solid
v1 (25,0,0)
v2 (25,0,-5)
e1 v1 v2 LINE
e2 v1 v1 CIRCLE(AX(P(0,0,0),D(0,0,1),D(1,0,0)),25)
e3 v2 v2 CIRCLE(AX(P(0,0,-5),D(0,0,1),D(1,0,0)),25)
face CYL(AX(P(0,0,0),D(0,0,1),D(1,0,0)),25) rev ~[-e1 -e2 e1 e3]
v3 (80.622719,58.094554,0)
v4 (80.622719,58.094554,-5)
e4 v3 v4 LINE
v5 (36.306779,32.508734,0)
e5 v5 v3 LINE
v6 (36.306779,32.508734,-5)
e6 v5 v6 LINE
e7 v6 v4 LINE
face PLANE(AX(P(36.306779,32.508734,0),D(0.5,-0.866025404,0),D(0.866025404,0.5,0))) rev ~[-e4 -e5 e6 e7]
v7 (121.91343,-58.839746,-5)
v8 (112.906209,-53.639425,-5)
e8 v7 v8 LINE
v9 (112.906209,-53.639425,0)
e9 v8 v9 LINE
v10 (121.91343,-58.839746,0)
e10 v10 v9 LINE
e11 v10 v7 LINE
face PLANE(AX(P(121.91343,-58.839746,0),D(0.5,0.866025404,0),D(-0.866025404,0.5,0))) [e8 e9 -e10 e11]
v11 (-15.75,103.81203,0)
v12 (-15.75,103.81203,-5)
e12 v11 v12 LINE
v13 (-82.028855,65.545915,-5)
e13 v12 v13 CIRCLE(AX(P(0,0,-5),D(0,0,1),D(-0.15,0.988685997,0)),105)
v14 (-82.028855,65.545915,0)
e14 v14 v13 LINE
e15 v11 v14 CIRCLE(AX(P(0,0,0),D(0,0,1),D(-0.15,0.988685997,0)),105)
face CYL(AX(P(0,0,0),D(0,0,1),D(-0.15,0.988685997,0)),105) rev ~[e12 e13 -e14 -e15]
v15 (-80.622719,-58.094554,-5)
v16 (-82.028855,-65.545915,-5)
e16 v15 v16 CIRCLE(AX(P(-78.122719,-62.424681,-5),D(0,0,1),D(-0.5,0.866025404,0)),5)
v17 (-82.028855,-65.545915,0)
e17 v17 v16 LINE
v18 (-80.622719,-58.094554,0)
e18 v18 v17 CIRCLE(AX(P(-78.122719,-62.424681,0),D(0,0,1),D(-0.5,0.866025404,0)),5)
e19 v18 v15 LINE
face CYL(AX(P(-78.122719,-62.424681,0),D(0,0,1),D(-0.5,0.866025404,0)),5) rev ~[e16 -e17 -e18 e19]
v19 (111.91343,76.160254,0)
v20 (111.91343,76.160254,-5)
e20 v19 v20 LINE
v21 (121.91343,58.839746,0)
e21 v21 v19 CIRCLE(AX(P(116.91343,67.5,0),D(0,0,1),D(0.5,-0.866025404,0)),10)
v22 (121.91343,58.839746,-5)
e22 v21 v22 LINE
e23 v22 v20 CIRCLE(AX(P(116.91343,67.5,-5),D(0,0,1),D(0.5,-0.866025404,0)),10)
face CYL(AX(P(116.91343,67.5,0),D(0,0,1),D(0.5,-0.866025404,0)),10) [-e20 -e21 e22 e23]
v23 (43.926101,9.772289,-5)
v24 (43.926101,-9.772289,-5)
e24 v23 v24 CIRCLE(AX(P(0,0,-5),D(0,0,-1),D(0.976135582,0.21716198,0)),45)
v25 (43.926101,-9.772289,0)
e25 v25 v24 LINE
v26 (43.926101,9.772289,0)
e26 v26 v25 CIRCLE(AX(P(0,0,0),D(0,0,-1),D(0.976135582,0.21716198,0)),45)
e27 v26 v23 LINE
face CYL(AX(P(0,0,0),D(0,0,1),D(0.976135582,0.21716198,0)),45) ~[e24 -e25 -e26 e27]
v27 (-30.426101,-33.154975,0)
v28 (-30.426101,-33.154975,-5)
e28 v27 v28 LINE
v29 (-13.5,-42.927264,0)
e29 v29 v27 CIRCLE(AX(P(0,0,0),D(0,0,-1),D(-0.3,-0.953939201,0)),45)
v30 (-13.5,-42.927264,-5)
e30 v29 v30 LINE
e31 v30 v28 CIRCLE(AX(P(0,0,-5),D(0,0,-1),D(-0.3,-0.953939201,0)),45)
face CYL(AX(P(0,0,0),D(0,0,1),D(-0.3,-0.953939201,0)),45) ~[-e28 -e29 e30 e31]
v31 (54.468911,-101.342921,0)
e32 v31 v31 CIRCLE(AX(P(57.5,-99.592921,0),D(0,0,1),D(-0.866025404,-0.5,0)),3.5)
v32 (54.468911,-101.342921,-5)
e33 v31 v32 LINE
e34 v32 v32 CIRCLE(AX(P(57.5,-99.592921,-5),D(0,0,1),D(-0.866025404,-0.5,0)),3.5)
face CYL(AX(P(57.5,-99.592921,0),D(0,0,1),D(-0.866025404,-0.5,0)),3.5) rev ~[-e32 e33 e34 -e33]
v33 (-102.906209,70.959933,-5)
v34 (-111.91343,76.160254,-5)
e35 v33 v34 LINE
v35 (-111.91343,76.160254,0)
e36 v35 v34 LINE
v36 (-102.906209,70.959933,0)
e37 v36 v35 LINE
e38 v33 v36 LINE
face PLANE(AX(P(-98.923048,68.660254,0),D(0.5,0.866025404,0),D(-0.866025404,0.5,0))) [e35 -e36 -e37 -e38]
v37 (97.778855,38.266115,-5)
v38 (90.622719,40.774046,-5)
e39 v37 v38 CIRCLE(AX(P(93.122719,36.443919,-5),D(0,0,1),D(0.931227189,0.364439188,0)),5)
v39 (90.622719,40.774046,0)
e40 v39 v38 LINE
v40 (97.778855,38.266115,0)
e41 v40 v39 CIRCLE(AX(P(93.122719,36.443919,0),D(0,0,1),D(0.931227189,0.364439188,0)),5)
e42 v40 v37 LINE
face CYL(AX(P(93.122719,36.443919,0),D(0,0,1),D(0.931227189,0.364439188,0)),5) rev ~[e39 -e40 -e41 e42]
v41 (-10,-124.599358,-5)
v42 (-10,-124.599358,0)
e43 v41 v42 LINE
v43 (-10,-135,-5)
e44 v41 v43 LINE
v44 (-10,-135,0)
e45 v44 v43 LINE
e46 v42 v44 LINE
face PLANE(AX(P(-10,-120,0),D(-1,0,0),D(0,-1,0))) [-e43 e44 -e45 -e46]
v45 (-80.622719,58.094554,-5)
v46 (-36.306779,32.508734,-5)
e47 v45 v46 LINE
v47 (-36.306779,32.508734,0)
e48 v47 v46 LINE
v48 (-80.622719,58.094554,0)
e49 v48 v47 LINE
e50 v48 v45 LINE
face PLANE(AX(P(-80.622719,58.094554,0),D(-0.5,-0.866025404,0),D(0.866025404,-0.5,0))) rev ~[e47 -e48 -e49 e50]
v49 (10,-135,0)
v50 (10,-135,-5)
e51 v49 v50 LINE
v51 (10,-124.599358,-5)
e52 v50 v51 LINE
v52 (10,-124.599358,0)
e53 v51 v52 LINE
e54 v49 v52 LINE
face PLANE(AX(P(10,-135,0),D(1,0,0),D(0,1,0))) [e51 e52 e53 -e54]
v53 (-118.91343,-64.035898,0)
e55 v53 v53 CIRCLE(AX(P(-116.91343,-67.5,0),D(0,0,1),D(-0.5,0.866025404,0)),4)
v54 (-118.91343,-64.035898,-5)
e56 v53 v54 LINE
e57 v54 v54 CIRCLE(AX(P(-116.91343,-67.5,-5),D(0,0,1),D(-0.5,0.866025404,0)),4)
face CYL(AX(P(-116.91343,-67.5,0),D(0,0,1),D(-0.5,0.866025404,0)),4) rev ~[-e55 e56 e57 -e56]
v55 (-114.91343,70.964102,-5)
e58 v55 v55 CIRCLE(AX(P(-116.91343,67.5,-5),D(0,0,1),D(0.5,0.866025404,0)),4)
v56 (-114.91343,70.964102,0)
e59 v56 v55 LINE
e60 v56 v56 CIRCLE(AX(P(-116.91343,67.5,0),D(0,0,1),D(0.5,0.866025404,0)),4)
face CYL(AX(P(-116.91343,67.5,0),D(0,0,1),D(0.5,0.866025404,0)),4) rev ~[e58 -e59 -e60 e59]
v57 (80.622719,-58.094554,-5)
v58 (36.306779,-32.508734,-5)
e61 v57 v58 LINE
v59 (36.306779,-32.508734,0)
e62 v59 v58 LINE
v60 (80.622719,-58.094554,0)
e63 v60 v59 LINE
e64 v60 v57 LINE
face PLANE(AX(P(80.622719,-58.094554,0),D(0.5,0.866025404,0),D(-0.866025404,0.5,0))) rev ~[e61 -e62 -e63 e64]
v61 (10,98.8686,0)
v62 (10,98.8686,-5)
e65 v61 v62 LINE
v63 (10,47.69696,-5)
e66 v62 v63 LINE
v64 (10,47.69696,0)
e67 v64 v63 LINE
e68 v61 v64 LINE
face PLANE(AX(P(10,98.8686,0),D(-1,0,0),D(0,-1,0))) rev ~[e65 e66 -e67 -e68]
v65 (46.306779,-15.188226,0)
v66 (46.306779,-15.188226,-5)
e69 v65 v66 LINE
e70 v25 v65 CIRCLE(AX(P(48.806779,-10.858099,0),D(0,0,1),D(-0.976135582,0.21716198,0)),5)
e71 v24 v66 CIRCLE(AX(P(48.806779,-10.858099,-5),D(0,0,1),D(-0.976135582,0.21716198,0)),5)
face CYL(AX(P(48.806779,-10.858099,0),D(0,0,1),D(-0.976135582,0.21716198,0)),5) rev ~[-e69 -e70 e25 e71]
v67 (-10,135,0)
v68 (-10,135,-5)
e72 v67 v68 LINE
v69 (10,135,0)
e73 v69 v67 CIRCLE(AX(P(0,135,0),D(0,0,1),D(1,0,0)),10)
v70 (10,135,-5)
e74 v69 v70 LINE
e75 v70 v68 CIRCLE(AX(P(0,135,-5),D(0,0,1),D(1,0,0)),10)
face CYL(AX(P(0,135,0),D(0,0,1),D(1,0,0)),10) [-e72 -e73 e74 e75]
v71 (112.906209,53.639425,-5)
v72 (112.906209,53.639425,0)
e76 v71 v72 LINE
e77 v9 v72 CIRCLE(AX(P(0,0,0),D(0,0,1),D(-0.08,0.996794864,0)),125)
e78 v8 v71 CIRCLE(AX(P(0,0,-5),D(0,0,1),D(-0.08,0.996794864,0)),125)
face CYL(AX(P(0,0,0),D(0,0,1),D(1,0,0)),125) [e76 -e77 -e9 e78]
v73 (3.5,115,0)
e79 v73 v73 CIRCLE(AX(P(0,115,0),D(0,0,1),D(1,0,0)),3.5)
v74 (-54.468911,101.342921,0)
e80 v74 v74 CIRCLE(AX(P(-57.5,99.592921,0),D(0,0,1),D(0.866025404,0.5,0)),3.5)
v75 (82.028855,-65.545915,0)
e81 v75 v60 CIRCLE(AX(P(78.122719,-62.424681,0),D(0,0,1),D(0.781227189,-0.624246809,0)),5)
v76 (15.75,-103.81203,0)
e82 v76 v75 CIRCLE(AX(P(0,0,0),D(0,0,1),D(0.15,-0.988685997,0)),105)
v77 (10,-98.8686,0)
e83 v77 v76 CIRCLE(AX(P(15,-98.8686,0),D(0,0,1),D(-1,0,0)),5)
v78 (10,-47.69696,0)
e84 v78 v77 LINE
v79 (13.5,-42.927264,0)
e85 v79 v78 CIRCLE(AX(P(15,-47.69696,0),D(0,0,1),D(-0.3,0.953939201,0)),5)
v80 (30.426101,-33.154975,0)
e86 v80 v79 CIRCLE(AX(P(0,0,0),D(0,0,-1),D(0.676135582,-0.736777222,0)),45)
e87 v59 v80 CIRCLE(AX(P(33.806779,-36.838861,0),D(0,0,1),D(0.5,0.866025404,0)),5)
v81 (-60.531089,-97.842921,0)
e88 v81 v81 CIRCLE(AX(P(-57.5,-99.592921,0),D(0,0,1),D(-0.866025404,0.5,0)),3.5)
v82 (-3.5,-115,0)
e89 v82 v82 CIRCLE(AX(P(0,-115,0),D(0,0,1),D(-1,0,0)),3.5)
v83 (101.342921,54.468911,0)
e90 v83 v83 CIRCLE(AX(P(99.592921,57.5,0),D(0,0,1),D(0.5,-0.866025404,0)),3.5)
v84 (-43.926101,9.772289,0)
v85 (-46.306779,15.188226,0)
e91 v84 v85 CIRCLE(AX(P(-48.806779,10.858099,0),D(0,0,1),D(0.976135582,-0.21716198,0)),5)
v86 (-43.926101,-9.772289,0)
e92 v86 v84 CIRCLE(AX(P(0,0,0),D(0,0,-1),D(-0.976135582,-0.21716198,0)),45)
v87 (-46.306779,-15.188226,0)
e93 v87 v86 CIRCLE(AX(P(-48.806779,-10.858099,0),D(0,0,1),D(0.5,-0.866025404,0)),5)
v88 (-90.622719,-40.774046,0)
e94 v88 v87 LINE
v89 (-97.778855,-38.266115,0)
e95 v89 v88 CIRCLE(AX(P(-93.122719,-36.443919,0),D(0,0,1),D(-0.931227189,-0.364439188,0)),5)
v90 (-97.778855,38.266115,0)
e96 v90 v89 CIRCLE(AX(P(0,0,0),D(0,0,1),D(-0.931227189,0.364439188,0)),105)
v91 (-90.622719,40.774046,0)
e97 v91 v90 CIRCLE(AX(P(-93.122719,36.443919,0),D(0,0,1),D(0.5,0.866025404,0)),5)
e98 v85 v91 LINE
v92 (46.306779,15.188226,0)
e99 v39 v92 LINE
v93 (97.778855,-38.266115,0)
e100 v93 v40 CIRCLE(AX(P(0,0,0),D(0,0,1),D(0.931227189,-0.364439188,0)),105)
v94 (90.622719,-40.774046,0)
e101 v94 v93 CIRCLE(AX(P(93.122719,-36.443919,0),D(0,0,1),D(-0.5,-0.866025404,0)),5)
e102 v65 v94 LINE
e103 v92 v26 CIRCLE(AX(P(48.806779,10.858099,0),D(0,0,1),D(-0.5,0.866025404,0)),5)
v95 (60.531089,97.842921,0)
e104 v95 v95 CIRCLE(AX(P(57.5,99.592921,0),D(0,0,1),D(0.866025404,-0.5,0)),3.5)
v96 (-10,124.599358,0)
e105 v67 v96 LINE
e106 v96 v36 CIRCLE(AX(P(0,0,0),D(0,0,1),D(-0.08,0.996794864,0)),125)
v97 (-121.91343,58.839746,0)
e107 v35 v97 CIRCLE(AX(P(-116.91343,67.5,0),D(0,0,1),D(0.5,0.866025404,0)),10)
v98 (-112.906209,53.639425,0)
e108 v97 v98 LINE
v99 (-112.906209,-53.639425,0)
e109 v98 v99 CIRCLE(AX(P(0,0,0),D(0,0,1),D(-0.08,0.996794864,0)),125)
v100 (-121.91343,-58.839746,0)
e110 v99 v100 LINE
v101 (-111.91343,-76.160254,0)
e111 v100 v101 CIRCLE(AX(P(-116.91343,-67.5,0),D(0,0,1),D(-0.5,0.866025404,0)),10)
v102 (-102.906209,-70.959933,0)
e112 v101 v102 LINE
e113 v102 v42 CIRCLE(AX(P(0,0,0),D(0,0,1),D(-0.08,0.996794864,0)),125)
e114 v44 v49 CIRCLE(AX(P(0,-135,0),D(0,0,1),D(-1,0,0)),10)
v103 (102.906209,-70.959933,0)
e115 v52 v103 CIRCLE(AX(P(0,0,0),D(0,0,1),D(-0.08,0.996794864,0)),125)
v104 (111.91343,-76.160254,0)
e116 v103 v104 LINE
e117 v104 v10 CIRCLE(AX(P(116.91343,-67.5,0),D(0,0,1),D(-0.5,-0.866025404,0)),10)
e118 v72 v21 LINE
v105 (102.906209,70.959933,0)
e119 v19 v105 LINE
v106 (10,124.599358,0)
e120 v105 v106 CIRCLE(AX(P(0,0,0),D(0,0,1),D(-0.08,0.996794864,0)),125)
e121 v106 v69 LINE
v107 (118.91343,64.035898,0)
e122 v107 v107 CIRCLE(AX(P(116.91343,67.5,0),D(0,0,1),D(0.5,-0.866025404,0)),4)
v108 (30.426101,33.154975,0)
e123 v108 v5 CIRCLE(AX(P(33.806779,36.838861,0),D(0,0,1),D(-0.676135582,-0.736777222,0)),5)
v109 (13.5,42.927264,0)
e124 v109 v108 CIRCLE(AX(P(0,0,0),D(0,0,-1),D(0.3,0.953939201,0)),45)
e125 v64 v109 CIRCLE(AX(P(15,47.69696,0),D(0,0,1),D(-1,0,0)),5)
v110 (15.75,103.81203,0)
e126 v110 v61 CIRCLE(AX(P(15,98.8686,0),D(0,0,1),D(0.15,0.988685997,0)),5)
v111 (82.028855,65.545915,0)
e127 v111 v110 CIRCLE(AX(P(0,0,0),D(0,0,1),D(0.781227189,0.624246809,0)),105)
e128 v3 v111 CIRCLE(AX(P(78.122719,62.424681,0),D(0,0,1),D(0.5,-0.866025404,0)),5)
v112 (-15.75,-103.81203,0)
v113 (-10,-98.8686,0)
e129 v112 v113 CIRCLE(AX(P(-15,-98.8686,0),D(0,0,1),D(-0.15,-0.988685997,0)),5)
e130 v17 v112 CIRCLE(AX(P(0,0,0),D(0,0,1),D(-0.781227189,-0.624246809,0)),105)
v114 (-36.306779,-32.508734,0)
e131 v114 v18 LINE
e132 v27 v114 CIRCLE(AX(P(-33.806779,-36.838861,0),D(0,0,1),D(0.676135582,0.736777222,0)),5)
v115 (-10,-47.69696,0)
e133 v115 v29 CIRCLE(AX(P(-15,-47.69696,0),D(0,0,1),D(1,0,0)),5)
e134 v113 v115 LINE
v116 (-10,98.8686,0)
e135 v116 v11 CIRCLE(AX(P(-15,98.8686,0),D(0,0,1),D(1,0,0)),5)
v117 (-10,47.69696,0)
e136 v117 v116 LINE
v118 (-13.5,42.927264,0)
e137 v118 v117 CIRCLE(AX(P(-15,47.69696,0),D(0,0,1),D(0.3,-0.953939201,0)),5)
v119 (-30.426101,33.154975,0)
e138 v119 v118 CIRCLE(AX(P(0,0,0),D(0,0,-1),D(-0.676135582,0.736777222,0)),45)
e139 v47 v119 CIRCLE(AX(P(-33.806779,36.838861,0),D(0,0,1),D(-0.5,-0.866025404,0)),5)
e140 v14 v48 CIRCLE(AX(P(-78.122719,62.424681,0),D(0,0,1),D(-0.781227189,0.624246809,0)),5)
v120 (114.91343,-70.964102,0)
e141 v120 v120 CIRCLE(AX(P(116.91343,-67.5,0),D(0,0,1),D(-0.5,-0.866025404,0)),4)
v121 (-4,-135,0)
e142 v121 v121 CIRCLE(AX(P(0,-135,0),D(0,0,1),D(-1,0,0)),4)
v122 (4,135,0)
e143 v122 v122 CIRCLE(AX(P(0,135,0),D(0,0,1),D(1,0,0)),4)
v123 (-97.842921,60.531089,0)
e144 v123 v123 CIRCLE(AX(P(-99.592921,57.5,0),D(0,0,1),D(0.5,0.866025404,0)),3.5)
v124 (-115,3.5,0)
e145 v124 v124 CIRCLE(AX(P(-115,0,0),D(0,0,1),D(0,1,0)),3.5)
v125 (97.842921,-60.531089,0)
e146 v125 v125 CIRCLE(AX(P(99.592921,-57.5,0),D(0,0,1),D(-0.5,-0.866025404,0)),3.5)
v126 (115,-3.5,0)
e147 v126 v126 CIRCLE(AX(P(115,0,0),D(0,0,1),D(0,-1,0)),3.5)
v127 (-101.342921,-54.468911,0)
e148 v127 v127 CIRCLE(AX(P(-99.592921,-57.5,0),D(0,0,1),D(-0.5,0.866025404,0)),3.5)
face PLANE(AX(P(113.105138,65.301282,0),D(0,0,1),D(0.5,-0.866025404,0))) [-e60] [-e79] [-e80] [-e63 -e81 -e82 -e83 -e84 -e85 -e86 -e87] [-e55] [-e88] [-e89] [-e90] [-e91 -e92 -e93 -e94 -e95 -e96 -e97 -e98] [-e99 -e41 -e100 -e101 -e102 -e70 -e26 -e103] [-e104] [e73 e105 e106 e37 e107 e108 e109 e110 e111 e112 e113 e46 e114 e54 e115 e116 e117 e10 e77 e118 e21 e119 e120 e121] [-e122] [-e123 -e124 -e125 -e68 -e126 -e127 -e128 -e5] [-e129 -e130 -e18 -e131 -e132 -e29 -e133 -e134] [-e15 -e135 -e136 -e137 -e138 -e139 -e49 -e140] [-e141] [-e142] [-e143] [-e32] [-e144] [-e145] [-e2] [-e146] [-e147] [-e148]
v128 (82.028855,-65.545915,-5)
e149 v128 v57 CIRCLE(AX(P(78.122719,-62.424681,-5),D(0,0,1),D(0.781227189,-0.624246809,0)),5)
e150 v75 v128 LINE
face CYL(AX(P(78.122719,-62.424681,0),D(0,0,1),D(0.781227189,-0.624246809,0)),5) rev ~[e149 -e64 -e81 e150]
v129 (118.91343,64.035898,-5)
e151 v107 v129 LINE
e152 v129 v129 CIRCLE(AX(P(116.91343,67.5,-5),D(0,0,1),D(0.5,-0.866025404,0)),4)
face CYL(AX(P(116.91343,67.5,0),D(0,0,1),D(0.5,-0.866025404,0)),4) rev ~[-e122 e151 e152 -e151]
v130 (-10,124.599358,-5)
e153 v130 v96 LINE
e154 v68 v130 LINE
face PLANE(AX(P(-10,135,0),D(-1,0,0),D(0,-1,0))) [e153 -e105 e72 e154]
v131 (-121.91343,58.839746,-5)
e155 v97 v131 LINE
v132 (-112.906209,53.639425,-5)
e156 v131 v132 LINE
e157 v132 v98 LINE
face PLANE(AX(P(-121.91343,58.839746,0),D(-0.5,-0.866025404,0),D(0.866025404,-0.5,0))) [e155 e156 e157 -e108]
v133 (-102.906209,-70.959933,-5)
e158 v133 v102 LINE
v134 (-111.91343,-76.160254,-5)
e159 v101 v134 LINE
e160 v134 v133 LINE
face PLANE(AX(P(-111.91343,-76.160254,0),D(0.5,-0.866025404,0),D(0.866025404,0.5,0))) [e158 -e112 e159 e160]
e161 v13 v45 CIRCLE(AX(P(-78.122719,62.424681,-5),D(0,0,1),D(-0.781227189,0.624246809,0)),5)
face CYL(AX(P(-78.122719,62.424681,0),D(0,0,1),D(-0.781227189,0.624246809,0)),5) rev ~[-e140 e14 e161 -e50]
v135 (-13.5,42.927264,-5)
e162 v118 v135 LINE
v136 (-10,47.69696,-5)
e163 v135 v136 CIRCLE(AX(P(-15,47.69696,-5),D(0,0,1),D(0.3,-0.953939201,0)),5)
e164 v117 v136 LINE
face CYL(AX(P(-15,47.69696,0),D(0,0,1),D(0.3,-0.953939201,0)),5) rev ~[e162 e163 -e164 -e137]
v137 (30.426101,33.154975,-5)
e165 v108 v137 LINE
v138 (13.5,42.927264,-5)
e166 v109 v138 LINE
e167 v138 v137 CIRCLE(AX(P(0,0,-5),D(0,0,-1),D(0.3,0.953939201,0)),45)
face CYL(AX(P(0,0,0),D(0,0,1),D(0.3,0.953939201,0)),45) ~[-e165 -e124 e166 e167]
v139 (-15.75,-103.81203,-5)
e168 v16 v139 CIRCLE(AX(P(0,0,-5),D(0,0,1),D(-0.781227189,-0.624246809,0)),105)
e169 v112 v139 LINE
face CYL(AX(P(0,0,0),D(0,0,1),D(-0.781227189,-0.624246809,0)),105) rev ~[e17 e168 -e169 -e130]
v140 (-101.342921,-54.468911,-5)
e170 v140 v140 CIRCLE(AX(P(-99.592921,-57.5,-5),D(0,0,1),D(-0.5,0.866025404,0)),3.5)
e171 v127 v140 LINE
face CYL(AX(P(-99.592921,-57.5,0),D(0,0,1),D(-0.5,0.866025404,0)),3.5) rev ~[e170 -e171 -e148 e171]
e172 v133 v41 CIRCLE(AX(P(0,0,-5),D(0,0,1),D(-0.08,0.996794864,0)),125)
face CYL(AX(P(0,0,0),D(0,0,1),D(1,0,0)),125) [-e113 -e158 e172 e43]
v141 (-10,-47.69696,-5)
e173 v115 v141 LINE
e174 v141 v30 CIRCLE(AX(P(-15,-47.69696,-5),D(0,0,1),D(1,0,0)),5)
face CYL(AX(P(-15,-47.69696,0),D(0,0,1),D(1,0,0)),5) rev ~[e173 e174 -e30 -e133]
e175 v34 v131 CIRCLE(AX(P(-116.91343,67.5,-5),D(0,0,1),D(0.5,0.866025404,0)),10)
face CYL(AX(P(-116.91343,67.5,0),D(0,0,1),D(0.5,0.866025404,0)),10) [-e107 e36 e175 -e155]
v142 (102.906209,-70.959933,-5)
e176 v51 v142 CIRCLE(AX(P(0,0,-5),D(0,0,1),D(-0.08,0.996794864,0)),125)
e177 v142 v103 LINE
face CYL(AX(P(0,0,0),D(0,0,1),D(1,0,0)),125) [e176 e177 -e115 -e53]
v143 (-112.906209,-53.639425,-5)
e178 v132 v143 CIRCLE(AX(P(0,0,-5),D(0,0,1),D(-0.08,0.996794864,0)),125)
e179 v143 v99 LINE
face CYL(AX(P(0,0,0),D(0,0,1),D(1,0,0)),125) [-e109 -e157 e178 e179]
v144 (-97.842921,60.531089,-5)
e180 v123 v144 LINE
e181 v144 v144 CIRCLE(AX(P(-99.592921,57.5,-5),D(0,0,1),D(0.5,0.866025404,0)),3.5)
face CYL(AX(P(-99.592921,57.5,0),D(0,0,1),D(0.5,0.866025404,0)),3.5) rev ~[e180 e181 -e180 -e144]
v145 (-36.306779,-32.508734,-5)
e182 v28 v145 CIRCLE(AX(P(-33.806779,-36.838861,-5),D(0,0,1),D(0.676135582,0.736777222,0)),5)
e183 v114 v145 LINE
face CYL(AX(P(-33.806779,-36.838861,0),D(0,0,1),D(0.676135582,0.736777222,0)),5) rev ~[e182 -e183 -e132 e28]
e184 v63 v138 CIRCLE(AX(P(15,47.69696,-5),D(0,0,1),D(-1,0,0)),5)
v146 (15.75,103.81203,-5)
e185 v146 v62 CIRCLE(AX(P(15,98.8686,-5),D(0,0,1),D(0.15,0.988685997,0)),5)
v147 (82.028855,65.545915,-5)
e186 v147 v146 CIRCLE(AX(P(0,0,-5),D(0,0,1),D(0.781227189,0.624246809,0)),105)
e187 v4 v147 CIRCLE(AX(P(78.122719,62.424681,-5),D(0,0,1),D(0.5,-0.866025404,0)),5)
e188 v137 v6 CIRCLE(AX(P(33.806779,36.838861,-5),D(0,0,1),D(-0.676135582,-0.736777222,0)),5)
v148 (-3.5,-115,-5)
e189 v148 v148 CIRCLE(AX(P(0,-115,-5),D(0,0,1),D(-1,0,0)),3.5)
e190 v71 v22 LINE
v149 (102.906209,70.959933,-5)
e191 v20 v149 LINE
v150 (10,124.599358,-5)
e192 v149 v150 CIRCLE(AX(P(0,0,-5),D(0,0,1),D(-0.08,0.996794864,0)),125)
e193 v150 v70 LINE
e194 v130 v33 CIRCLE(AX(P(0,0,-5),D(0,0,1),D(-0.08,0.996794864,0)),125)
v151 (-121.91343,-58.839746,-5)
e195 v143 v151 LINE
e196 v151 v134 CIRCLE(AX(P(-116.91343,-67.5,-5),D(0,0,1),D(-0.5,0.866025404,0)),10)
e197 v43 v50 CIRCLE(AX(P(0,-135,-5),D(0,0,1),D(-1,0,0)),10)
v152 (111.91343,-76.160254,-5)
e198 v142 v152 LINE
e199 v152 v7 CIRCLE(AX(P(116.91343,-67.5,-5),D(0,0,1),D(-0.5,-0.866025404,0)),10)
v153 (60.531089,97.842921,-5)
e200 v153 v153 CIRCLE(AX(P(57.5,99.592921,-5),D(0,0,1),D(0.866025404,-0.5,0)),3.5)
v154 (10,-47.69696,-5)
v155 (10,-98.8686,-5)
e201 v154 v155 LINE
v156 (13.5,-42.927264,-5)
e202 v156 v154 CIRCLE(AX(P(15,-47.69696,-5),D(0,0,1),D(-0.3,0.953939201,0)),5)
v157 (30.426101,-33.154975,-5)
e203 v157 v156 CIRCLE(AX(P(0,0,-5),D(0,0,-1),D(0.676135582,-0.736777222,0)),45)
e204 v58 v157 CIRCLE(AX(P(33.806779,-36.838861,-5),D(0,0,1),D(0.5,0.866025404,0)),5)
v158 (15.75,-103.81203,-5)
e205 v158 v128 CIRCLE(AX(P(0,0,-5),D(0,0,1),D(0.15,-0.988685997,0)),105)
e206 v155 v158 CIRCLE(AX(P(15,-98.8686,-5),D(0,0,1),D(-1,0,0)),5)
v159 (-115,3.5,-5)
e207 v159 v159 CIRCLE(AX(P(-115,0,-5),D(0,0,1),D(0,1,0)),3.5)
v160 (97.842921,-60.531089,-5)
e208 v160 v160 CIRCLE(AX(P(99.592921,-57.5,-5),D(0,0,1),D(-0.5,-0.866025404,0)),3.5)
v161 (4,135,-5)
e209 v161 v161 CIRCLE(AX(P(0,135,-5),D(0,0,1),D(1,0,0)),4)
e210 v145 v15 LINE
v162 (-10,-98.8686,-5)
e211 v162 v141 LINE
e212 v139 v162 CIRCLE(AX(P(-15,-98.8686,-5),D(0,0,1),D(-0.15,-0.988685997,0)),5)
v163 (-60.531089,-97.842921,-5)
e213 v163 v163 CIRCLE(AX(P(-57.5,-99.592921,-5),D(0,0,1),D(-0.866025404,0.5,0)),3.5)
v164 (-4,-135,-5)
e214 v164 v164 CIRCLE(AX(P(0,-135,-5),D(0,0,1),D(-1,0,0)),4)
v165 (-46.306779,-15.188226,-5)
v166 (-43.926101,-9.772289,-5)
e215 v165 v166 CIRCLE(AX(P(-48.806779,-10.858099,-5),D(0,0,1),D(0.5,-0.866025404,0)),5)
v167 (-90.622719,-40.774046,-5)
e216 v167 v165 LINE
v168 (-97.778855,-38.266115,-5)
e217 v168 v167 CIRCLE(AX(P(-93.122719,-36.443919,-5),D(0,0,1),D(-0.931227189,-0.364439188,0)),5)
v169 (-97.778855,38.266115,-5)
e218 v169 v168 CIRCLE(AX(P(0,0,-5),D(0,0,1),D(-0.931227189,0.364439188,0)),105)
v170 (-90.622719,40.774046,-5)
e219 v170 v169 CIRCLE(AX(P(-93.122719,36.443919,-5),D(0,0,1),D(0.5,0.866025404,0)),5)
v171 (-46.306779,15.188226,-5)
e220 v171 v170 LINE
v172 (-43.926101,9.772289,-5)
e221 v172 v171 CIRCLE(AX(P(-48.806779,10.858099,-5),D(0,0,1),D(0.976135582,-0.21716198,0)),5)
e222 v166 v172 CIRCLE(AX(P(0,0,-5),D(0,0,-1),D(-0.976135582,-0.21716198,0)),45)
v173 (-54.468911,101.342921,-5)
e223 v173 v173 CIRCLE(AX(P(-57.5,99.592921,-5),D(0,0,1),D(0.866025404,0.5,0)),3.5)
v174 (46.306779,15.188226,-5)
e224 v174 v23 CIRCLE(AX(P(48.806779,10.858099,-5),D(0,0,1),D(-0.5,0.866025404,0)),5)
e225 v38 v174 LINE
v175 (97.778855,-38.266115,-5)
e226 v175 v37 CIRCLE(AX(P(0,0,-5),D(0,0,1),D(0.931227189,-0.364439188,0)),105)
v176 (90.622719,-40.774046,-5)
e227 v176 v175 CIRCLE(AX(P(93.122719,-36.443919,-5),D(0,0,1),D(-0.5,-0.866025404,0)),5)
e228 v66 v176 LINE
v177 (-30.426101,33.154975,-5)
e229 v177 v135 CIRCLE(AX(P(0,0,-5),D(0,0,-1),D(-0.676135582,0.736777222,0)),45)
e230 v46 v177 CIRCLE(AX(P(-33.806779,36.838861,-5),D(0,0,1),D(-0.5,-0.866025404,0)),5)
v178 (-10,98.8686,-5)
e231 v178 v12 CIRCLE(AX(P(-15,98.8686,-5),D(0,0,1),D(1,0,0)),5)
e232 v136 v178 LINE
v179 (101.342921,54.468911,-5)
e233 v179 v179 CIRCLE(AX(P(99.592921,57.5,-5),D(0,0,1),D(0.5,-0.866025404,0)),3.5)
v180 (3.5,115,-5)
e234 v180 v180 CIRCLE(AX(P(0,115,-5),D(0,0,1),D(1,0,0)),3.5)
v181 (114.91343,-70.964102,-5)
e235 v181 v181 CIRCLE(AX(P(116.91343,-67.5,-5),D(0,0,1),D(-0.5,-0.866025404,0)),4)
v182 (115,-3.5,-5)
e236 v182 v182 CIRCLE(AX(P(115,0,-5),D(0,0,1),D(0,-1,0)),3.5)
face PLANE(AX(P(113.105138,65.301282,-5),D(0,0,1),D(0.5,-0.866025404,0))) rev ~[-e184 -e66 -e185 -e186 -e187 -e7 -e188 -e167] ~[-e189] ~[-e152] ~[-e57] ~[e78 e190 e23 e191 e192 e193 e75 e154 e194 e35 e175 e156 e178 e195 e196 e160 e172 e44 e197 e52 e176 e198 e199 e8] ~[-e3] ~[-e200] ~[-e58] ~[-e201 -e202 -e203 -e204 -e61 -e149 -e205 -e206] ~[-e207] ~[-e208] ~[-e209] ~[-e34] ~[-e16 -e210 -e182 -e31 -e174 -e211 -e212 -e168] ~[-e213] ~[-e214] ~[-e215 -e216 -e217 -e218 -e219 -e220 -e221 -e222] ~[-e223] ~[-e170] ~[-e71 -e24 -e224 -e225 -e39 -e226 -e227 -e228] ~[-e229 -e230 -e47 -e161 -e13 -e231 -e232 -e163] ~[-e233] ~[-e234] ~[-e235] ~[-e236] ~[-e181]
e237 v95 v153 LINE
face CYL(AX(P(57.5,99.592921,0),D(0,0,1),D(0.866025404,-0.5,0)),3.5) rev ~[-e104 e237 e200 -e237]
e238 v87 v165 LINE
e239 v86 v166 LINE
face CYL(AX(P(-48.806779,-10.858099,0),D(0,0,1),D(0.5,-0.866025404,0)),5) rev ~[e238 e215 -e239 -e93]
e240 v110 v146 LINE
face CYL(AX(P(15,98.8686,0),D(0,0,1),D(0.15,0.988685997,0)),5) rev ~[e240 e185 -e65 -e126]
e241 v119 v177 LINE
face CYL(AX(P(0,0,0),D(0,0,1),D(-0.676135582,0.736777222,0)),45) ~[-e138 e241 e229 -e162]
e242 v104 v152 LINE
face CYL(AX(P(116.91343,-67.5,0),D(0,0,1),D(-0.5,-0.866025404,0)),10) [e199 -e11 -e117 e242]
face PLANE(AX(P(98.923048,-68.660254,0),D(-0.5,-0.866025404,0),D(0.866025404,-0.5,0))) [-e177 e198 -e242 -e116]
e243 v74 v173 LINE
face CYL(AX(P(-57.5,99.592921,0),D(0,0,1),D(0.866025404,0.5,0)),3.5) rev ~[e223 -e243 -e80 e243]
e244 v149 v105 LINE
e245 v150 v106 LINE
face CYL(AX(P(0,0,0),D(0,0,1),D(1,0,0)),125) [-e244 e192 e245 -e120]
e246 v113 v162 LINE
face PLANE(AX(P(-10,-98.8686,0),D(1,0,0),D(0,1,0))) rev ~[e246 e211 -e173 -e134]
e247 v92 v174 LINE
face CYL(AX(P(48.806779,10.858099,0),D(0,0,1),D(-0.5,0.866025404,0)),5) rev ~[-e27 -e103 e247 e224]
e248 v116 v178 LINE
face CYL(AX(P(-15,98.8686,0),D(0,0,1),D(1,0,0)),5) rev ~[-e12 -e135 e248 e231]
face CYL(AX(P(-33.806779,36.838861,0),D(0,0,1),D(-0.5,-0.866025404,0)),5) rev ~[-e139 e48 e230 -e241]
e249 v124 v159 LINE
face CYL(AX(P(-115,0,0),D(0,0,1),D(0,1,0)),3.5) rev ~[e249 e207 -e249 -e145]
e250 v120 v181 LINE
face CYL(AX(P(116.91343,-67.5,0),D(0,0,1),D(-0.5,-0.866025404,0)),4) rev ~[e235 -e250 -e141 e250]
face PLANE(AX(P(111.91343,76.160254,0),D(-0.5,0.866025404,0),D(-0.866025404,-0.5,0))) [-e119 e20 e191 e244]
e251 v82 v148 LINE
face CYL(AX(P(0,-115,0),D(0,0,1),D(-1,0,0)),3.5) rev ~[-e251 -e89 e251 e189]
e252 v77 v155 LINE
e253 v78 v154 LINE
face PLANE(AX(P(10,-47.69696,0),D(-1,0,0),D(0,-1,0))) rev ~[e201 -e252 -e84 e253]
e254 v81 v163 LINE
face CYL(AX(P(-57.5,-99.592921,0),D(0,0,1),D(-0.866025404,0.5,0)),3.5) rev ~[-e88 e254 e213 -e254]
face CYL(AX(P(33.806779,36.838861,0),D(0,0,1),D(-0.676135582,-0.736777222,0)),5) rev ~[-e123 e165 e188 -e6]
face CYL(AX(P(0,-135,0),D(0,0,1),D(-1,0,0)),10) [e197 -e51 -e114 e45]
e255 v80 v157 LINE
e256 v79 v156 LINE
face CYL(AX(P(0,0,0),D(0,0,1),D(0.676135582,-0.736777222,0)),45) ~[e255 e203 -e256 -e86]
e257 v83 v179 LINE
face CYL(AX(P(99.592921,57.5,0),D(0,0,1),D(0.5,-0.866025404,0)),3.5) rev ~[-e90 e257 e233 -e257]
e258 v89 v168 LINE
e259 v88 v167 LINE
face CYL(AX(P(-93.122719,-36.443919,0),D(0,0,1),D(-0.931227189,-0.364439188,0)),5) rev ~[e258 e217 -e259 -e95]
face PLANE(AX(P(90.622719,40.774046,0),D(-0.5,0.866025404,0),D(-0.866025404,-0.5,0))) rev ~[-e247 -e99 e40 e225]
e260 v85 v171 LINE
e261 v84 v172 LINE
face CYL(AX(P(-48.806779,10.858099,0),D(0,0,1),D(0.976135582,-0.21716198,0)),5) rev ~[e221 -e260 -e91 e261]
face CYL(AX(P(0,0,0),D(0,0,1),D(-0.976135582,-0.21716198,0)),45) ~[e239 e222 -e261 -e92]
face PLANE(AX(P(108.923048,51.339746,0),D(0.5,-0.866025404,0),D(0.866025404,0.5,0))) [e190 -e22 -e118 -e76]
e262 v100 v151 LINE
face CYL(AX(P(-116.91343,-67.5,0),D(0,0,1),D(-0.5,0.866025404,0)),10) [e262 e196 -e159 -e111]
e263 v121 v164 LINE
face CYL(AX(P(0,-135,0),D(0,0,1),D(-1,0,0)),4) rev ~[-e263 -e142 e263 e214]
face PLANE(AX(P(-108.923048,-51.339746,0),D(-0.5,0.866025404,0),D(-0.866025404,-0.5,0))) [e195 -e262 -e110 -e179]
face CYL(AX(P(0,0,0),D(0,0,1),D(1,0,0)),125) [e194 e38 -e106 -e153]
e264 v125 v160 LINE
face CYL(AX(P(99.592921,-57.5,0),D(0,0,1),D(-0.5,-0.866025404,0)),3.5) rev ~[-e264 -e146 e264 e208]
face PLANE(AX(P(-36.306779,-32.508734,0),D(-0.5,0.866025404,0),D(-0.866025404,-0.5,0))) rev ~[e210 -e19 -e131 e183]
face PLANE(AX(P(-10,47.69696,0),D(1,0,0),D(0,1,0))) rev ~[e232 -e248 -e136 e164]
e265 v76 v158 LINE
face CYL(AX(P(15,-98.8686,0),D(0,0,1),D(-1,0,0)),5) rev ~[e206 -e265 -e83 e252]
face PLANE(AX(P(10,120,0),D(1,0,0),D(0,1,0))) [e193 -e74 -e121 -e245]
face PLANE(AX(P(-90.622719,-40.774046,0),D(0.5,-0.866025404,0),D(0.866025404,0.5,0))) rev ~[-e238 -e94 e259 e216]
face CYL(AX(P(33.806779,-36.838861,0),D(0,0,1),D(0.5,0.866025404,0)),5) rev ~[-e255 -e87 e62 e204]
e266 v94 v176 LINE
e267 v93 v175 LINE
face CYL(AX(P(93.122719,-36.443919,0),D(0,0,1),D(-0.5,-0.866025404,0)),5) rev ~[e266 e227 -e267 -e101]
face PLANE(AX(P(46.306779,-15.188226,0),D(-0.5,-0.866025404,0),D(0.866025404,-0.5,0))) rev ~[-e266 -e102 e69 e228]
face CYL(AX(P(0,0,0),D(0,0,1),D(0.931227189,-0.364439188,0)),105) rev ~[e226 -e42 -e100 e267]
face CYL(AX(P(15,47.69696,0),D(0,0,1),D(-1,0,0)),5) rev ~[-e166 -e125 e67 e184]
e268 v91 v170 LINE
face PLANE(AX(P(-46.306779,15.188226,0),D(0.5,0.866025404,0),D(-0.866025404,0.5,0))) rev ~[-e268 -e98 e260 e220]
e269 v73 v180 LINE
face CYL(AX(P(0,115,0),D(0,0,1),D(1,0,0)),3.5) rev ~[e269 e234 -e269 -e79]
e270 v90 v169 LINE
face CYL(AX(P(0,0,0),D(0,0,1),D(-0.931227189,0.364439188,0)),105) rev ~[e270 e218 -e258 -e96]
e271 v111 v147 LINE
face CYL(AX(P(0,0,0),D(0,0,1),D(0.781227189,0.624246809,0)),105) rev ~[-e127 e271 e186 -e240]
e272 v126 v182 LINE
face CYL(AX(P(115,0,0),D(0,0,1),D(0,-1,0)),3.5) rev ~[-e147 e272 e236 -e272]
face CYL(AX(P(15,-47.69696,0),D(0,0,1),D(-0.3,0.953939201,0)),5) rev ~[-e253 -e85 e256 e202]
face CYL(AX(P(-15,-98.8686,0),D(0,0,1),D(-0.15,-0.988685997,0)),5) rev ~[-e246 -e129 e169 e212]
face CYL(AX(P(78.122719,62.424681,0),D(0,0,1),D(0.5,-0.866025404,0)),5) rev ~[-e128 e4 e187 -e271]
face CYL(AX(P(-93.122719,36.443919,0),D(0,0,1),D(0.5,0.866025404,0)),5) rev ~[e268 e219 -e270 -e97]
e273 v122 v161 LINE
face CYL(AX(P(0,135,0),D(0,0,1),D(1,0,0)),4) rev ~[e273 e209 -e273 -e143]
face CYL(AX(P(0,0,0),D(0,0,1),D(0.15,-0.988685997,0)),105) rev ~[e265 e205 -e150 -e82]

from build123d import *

# Parameters (mm, degrees)
F1_R             = 125
F4_DEPTH         = 5
F5_DEPTH         = 5
F5_COPIES_COUNT  = 6
F6_DEPTH         = 5
F6_COPIES_COUNT  = 6
F0_R             = 25
F7_DEPTH         = 25
F8_R             = 4
F9_DEPTH         = 5
F9_COPIES_COUNT  = 6
F10_R            = 3.5
F11_DEPTH        = 5
F11_COPIES_COUNT = 12


# Not quite as in the source:
# - a pattern or mirror of a feature is missing from the dataset's text; its kind, count and spacing are read off the source's solid


with BuildPart() as f4:
    # F1 (on Top) → F4 (new body)
    with BuildSketch(Plane.XY):
        Circle(F1_R)
    extrude(amount=-F4_DEPTH)

    # F2 (on Top) → F5 (cut, through all)
    with BuildSketch(Plane.XY):
        with BuildLine():
            ThreePointArc((15.75, 103.8120296497), (11.7403987974, 102.6600373885), (10, 98.8685996664))
            Line((10, 98.8685996664), (10, 47.6969600708))
            ThreePointArc((10, 47.6969600708), (10.9688711259, 44.7389201793), (13.5, 42.9272640638))
            ThreePointArc((13.5, 42.9272640638), (22.5, 38.9711431703), (30.4261011942, 33.154974983))
            ThreePointArc((30.4261011942, 33.154974983), (33.2606058502, 31.8687811355), (36.3067791046, 32.5087340733))
            Line((36.3067791046, 32.5087340733), (80.6227189477, 58.0945538711))
            ThreePointArc((80.6227189477, 58.0945538711), (83.0360009332, 61.4975023033), (82.0288548951, 65.5459149345))
            ThreePointArc((82.0288548951, 65.5459149345), (52.5, 90.9326673974), (15.75, 103.8120296497))
        make_face()
    f5 = extrude(amount=-F5_DEPTH, mode=Mode.SUBTRACT)

    # F5_copies: F5 ×6 about axis
    f5_copies_axis = Axis((0, 0, 0), (0, 0, 1))
    for i in range(1, F5_COPIES_COUNT):
        add(f5.rotate(f5_copies_axis, i * 360 / F5_COPIES_COUNT), mode=Mode.SUBTRACT)

    # F3 (on Top) → F6 (join, through all)
    with BuildSketch(Plane.XY):
        with BuildLine():
            Line((-10, 135), (-10, 120))
            Line((-10, 120), (10, 120))
            Line((10, 120), (10, 135))
            ThreePointArc((10, 135), (0, 145), (-10, 135))
        make_face()
    f6 = extrude(amount=-F6_DEPTH)

    # F6_copies: F6 ×6 about axis
    f6_copies_axis = Axis((0, 0, 0), (0, 0, 1))
    for i in range(1, F6_COPIES_COUNT):
        add(f6.rotate(f6_copies_axis, i * 360 / F6_COPIES_COUNT))

    # F0 (on Top) → F7 (cut)
    with BuildSketch(Plane.XY):
        Circle(F0_R)
    extrude(amount=-F7_DEPTH, mode=Mode.SUBTRACT)

    # F8 (on Top) → F9 (cut, through all)
    with BuildSketch(Plane.XY):
        with Locations((0, 135)):
            Circle(F8_R)
    f9 = extrude(amount=-F9_DEPTH, mode=Mode.SUBTRACT)

    # F9_copies: F9 ×6 about axis
    f9_copies_axis = Axis((0, 0, 0), (0, 0, 1))
    for i in range(1, F9_COPIES_COUNT):
        add(f9.rotate(f9_copies_axis, i * 360 / F9_COPIES_COUNT), mode=Mode.SUBTRACT)

    # F10 (on Top) → F11 (cut, through all)
    with BuildSketch(Plane.XY):
        with Locations((0, 115)):
            Circle(F10_R)
    f11 = extrude(amount=-F11_DEPTH, mode=Mode.SUBTRACT)

    # F11_copies: F11 ×12 about axis
    f11_copies_axis = Axis((0, 0, 0), (0, 0, 1))
    for i in range(1, F11_COPIES_COUNT):
        add(f11.rotate(f11_copies_axis, i * 360 / F11_COPIES_COUNT), mode=Mode.SUBTRACT)


solid = f4.part
